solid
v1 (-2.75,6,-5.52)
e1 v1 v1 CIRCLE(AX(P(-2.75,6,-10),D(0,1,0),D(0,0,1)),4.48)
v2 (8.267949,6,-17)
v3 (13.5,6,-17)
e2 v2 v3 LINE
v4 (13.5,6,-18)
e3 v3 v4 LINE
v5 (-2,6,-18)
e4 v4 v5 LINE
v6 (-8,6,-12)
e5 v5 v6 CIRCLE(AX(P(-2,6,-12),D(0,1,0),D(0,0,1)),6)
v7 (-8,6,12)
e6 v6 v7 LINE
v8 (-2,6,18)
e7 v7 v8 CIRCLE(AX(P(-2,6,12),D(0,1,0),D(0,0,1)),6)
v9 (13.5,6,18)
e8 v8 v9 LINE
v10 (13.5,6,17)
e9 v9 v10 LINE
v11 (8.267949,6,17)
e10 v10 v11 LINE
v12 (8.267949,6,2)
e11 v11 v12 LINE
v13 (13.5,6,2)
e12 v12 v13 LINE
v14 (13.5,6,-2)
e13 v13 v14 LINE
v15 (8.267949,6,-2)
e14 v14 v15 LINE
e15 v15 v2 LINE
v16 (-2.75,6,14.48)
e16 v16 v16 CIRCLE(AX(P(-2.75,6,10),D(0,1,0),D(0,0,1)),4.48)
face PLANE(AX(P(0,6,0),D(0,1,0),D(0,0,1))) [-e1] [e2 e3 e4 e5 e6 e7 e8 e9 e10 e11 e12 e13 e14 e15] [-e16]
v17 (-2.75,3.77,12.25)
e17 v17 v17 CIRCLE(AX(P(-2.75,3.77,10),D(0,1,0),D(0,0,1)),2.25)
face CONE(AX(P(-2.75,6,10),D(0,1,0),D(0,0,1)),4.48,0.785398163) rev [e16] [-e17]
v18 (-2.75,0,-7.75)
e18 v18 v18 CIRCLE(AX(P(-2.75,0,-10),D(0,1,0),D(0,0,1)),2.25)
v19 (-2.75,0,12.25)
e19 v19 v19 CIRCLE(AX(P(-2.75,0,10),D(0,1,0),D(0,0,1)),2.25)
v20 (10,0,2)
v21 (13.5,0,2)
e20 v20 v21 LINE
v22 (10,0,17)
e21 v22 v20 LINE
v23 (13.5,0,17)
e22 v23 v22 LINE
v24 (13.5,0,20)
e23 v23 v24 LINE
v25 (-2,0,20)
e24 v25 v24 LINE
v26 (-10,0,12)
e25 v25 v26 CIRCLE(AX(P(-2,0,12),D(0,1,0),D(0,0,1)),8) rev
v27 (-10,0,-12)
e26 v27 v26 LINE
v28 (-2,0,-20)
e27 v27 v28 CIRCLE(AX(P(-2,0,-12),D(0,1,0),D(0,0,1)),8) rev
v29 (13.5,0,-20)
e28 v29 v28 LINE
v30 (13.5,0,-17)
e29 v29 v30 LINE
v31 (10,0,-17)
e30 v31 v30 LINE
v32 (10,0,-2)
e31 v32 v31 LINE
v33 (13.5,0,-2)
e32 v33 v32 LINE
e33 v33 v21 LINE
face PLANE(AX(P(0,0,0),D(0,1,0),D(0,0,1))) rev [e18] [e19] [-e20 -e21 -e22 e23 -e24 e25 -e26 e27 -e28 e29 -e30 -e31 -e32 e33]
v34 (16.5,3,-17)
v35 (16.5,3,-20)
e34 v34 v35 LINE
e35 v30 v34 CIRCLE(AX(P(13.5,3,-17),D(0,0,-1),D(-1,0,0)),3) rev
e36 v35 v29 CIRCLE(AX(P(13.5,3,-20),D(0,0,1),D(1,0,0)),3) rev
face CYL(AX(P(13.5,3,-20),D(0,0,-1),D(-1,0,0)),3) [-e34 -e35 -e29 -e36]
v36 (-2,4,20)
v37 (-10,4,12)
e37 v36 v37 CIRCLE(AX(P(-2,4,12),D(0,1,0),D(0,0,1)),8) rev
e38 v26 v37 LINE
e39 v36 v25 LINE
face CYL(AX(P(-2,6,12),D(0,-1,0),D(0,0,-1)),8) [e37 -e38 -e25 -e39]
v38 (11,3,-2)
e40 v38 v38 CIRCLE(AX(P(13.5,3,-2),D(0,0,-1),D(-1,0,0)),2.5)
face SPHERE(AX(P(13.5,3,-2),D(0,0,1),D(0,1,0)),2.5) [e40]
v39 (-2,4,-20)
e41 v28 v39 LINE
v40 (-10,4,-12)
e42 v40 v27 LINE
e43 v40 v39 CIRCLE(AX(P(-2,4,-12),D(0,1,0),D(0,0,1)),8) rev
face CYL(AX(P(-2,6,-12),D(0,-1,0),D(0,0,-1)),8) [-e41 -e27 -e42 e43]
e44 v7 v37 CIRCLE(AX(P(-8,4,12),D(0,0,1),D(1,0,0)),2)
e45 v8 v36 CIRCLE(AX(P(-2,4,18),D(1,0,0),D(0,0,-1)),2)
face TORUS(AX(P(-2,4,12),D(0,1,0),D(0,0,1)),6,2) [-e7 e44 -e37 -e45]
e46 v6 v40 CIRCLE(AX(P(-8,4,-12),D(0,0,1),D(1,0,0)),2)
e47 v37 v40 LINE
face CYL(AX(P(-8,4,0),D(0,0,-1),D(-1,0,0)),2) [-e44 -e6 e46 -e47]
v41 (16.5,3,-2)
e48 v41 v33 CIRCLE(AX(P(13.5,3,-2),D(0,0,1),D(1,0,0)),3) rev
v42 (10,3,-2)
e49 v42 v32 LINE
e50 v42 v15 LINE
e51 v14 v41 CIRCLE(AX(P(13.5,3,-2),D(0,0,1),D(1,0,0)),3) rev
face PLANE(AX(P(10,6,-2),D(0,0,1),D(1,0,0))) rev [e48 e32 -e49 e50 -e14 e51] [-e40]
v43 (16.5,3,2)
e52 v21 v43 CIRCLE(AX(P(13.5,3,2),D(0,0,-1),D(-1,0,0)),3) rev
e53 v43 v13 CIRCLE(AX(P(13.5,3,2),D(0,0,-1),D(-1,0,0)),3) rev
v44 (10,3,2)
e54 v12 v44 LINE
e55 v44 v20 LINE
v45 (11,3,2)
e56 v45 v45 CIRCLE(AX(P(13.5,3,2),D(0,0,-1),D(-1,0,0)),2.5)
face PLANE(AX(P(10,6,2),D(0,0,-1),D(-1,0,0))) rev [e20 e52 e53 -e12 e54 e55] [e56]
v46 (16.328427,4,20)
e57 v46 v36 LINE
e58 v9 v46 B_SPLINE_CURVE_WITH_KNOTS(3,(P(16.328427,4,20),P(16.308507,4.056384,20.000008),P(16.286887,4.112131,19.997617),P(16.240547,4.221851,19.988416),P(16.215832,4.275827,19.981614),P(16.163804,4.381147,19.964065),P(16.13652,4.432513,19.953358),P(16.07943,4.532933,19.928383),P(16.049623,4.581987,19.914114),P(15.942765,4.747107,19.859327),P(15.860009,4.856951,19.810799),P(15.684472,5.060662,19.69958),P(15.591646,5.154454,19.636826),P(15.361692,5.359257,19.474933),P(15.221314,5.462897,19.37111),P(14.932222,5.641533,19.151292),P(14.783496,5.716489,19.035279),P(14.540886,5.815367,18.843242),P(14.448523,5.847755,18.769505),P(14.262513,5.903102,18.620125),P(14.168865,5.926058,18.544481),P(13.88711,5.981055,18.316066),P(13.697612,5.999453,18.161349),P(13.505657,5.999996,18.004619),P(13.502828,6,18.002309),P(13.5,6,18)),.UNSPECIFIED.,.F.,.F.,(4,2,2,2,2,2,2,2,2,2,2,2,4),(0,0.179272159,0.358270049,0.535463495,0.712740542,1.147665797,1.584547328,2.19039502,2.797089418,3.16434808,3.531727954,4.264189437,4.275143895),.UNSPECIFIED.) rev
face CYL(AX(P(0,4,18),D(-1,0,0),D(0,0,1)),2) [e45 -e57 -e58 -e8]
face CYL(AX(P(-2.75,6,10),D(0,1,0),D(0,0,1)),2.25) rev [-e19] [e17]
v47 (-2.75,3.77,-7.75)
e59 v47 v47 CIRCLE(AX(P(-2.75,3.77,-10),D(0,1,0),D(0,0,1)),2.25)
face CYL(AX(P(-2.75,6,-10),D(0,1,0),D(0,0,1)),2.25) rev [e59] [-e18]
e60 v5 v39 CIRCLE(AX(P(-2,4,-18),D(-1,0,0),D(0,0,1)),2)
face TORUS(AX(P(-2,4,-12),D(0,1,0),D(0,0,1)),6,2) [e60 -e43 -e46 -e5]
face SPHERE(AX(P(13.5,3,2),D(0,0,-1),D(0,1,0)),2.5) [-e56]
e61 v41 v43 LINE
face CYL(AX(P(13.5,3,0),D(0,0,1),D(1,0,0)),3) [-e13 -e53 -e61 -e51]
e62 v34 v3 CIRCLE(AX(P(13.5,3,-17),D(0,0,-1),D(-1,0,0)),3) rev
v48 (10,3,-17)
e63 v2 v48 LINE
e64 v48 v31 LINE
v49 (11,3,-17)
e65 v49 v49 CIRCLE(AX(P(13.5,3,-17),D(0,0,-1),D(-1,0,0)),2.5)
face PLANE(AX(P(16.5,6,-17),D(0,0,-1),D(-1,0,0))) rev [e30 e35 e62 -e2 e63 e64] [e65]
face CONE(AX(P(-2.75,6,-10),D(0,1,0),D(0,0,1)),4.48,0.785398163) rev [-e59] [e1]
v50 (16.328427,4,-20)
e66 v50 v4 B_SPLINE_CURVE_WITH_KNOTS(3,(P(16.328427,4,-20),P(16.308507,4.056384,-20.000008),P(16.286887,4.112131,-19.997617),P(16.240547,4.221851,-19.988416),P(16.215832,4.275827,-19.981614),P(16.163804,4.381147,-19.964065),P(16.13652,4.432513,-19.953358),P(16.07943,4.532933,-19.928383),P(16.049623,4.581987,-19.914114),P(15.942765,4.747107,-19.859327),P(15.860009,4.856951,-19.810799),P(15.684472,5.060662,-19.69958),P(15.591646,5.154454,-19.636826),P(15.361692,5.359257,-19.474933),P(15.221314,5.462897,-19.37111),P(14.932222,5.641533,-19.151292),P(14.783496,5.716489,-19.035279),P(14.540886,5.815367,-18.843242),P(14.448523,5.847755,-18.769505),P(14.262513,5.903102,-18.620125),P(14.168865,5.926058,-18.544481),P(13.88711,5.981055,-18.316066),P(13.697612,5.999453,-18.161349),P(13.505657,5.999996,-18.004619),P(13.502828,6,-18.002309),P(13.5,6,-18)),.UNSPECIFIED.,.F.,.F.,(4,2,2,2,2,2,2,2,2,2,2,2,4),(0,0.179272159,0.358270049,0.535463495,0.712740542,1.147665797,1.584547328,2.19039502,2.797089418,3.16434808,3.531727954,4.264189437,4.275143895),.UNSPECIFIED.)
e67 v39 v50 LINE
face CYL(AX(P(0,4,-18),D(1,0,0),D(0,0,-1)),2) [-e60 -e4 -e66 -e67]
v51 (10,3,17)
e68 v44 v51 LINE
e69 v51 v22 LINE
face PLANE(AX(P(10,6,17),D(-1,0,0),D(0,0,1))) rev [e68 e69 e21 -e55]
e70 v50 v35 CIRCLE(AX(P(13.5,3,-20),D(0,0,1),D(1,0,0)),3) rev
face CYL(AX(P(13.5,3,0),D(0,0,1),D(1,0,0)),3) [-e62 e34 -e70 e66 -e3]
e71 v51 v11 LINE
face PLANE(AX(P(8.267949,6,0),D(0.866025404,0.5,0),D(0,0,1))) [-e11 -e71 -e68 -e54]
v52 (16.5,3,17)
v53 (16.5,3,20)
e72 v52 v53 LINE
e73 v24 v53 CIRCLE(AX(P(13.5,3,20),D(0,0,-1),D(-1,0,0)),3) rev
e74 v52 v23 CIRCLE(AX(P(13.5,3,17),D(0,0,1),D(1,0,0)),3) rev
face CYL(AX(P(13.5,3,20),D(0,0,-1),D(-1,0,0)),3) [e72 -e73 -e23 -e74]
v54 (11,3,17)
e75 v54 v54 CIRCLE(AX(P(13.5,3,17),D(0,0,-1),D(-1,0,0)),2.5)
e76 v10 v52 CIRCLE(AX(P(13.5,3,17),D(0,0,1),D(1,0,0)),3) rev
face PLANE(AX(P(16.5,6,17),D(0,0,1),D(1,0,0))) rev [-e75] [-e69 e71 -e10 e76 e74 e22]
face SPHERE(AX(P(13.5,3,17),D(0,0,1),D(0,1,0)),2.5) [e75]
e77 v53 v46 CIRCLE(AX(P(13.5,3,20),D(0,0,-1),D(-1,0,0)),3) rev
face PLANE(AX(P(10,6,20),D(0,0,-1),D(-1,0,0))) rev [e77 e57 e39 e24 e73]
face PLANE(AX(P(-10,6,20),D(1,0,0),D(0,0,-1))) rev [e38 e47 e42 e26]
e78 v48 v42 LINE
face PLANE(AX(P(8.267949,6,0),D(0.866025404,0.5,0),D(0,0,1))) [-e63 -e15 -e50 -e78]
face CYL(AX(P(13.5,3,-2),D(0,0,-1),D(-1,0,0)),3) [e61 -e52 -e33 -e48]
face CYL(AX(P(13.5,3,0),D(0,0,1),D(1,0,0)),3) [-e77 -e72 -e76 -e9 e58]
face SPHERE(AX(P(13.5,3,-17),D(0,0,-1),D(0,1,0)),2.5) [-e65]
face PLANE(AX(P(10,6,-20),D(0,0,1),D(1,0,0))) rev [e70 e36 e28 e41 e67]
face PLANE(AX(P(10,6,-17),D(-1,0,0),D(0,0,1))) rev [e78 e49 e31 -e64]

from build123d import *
from OCP.BRepFilletAPI import BRepFilletAPI_MakeChamfer

# Parameters (mm, degrees)
BOSS_EXTRUDE1_DEPTH           = 6
FILLET1_R                     = 3
LPATTERN1_COUNT               = 2
LPATTERN1_PITCH               = 19
CSK_FOR_M4_SFHCS1_D           = 4.5
CSK_FOR_M4_SFHCS1_CSINK_D     = 8.96
CSK_FOR_M4_SFHCS1_CSINK_ANGLE = 90
FILLET2_R                     = 8
FILLET3_R                     = 2
CHAMFER1_SIZE                 = 3
CHAMFER1_SIZE2                = 1.732050808


# Some blends are built 0.0001 mm under size
with BuildPart() as part:
    # Sketch1 → Boss-Extrude1 (new body)
    with BuildSketch(Plane(origin=(0, 0, 0), x_dir=(1, 0, 0), z_dir=(0, 1, 0))):
        Polygon((10, 20), (16.5, 20), (16.5, 17), (10, 17), (10, 2), (16.5, 2), (16.5, -2), (10, -2), (10, -17), (16.5, -17), (16.5, -20), (10, -20), (-10, -20), (-10, 20), align=None)
    extrude(amount=BOSS_EXTRUDE1_DEPTH)

    # Fillet1
    fillet1_edges = [part.edges().sort_by_distance(p)[0] for p in [
        (16.5, 6, -18.5),
        (16.5, 0, -18.5),
        (16.5, 0, 0),
        (16.5, 0, 18.5),
        (16.5, 6, 0),
        (16.5, 6, 18.5),
    ]]
    fillet(fillet1_edges, radius=FILLET1_R - 0.0001)  # a hair under: the kernel refuses the full size

    # Sketch2 → Revolve1 (revolve)
    with BuildSketch(Plane(origin=(13.5, 0, 0), x_dir=(0, 0, -1), z_dir=(1, 0, 0))):
        with BuildLine():
            Line((-2, 3), (-2, 5.5))
            ThreePointArc((-2, 5.5), (-3.767766953, 4.767766953), (-4.5, 3))
            Line((-4.5, 3), (-2, 3))
        make_face()
    revolve1 = revolve(axis=Axis((13.5, 3, 2), (0, 0, 1)))

    # LPattern1: Revolve1 ×2
    with Locations(*[(0, 0, -i * LPATTERN1_PITCH) for i in range(1, LPATTERN1_COUNT)]):
        add(revolve1)

    # Mirror1: Revolve1 across plane
    add(revolve1.mirror(Plane.XY))

    # Mirror1 copy 1 sketch → Mirror1 copy 1 (revolve)
    with BuildSketch(Plane(origin=(13.5, 0, 19), x_dir=(0, 0, 1), z_dir=(1, 0, 0))):
        with BuildLine():
            Line((-2, -3), (-2, -5.5))
            ThreePointArc((-2, -5.5), (-3.767766953, -4.767766953), (-4.5, -3))
            Line((-4.5, -3), (-2, -3))
        make_face()
    revolve(axis=Axis((13.5, 3, 17), (0, 0, 1)))

    # CSK for M4 SFHCS1 (through all)
    with Locations(Plane(origin=(-2.75, 6, -10), x_dir=(0, 0, 1), z_dir=(0, 1, 0))):
        with Locations((0, 0), (20, 0)):
            CounterSinkHole(CSK_FOR_M4_SFHCS1_D / 2, CSK_FOR_M4_SFHCS1_CSINK_D / 2, counter_sink_angle=CSK_FOR_M4_SFHCS1_CSINK_ANGLE)

    # Fillet2
    fillet2_edges = [part.edges().sort_by_distance(p)[0] for p in [
        (-10, 3, -20),
        (-10, 3, 20),
    ]]
    fillet(fillet2_edges, radius=FILLET2_R)

    # Fillet3
    # the kernel refuses this fillet: 2 mm, written as the material it takes off along each edge
    with BuildSketch(Plane(origin=(18.5001, 6, 20), x_dir=(0, 0, -1), z_dir=(-1, 0, 0))) as fillet3_piece_1:
        with BuildLine():
            CenterArc((FILLET3_R, FILLET3_R), FILLET3_R, 180, 90)
            Line((0, FILLET3_R), (0, 0))
            Line((0, 0), (FILLET3_R, 0))
        make_face()
    extrude(amount=20.5001, mode=Mode.SUBTRACT)
    with BuildSketch(Plane(origin=(-2, 6, 12), x_dir=(-1, 0, 0), z_dir=(0, 0, -1))) as fillet3_piece_2:
        with BuildLine():
            CenterArc((8 - FILLET3_R, -FILLET3_R), FILLET3_R, 0, 90)
            Line((8, -FILLET3_R), (8, 0))
            Line((8, 0), (8 - FILLET3_R, 0))
        make_face()
    revolve(axis=Axis((-2, 6, 12), (0, 1, 0)), revolution_arc=90, mode=Mode.SUBTRACT)
    with BuildSketch(Plane(origin=(-2, 6, -12), x_dir=(0, 0, -1), z_dir=(1, 0, 0))) as fillet3_piece_3:
        with BuildLine():
            CenterArc((8 - FILLET3_R, -FILLET3_R), FILLET3_R, 0, 90)
            Line((8 - FILLET3_R, 0), (8, 0))
            Line((8, 0), (8, -FILLET3_R))
        make_face()
    revolve(axis=Axis((-2, 6, -12), (0, 1, 0)), revolution_arc=90, mode=Mode.SUBTRACT)
    with BuildSketch(Plane(origin=(-2, 6, -20), x_dir=(0, -1, 0), z_dir=(1, 0, 0))) as fillet3_piece_4:
        with BuildLine():
            CenterArc((FILLET3_R, -FILLET3_R), FILLET3_R, 90, 90)
            Line((0, -FILLET3_R), (0, 0))
            Line((0, 0), (FILLET3_R, 0))
        make_face()
    extrude(amount=20.5001, mode=Mode.SUBTRACT)
    with BuildSketch(Plane(origin=(-10, 6, 12), x_dir=(1, 0, 0), z_dir=(0, 0, -1))) as fillet3_piece_5:
        with BuildLine():
            CenterArc((FILLET3_R, FILLET3_R), FILLET3_R, 180, 90)
            Line((0, FILLET3_R), (0, 0))
            Line((0, 0), (FILLET3_R, 0))
        make_face()
    extrude(amount=24, mode=Mode.SUBTRACT)

    # Chamfer1: one chamfer whose edges measure the first distance from different faces: ONE call of the kernel's chamfer builder (chamfer() names one face for all edges)
    chamfer1_edges_1 = [part.edges().sort_by_distance(p)[0] for p in [
        (10, 6, 9.5),
    ]]
    chamfer1_side_1 = [part.faces().sort_by_distance(p)[0] for p in [
        (10, 3, 9.5),
    ]]
    chamfer1_edges_2 = [part.edges().sort_by_distance(p)[0] for p in [
        (10, 6, -9.5),
    ]]
    chamfer1_side_2 = [part.faces().sort_by_distance(p)[0] for p in [
        (10, 3, -9.5),
    ]]
    chamfer1 = BRepFilletAPI_MakeChamfer(part.part.solid().wrapped)
    for e in chamfer1_edges_1:
        chamfer1.Add(CHAMFER1_SIZE, CHAMFER1_SIZE2, e.wrapped, chamfer1_side_1[0].wrapped)  # the first distance lies on this face
    for e in chamfer1_edges_2:
        chamfer1.Add(CHAMFER1_SIZE, CHAMFER1_SIZE2, e.wrapped, chamfer1_side_2[0].wrapped)  # the first distance lies on this face
    add(Compound.cast(chamfer1.Shape()), mode=Mode.REPLACE)


solid = part.part
